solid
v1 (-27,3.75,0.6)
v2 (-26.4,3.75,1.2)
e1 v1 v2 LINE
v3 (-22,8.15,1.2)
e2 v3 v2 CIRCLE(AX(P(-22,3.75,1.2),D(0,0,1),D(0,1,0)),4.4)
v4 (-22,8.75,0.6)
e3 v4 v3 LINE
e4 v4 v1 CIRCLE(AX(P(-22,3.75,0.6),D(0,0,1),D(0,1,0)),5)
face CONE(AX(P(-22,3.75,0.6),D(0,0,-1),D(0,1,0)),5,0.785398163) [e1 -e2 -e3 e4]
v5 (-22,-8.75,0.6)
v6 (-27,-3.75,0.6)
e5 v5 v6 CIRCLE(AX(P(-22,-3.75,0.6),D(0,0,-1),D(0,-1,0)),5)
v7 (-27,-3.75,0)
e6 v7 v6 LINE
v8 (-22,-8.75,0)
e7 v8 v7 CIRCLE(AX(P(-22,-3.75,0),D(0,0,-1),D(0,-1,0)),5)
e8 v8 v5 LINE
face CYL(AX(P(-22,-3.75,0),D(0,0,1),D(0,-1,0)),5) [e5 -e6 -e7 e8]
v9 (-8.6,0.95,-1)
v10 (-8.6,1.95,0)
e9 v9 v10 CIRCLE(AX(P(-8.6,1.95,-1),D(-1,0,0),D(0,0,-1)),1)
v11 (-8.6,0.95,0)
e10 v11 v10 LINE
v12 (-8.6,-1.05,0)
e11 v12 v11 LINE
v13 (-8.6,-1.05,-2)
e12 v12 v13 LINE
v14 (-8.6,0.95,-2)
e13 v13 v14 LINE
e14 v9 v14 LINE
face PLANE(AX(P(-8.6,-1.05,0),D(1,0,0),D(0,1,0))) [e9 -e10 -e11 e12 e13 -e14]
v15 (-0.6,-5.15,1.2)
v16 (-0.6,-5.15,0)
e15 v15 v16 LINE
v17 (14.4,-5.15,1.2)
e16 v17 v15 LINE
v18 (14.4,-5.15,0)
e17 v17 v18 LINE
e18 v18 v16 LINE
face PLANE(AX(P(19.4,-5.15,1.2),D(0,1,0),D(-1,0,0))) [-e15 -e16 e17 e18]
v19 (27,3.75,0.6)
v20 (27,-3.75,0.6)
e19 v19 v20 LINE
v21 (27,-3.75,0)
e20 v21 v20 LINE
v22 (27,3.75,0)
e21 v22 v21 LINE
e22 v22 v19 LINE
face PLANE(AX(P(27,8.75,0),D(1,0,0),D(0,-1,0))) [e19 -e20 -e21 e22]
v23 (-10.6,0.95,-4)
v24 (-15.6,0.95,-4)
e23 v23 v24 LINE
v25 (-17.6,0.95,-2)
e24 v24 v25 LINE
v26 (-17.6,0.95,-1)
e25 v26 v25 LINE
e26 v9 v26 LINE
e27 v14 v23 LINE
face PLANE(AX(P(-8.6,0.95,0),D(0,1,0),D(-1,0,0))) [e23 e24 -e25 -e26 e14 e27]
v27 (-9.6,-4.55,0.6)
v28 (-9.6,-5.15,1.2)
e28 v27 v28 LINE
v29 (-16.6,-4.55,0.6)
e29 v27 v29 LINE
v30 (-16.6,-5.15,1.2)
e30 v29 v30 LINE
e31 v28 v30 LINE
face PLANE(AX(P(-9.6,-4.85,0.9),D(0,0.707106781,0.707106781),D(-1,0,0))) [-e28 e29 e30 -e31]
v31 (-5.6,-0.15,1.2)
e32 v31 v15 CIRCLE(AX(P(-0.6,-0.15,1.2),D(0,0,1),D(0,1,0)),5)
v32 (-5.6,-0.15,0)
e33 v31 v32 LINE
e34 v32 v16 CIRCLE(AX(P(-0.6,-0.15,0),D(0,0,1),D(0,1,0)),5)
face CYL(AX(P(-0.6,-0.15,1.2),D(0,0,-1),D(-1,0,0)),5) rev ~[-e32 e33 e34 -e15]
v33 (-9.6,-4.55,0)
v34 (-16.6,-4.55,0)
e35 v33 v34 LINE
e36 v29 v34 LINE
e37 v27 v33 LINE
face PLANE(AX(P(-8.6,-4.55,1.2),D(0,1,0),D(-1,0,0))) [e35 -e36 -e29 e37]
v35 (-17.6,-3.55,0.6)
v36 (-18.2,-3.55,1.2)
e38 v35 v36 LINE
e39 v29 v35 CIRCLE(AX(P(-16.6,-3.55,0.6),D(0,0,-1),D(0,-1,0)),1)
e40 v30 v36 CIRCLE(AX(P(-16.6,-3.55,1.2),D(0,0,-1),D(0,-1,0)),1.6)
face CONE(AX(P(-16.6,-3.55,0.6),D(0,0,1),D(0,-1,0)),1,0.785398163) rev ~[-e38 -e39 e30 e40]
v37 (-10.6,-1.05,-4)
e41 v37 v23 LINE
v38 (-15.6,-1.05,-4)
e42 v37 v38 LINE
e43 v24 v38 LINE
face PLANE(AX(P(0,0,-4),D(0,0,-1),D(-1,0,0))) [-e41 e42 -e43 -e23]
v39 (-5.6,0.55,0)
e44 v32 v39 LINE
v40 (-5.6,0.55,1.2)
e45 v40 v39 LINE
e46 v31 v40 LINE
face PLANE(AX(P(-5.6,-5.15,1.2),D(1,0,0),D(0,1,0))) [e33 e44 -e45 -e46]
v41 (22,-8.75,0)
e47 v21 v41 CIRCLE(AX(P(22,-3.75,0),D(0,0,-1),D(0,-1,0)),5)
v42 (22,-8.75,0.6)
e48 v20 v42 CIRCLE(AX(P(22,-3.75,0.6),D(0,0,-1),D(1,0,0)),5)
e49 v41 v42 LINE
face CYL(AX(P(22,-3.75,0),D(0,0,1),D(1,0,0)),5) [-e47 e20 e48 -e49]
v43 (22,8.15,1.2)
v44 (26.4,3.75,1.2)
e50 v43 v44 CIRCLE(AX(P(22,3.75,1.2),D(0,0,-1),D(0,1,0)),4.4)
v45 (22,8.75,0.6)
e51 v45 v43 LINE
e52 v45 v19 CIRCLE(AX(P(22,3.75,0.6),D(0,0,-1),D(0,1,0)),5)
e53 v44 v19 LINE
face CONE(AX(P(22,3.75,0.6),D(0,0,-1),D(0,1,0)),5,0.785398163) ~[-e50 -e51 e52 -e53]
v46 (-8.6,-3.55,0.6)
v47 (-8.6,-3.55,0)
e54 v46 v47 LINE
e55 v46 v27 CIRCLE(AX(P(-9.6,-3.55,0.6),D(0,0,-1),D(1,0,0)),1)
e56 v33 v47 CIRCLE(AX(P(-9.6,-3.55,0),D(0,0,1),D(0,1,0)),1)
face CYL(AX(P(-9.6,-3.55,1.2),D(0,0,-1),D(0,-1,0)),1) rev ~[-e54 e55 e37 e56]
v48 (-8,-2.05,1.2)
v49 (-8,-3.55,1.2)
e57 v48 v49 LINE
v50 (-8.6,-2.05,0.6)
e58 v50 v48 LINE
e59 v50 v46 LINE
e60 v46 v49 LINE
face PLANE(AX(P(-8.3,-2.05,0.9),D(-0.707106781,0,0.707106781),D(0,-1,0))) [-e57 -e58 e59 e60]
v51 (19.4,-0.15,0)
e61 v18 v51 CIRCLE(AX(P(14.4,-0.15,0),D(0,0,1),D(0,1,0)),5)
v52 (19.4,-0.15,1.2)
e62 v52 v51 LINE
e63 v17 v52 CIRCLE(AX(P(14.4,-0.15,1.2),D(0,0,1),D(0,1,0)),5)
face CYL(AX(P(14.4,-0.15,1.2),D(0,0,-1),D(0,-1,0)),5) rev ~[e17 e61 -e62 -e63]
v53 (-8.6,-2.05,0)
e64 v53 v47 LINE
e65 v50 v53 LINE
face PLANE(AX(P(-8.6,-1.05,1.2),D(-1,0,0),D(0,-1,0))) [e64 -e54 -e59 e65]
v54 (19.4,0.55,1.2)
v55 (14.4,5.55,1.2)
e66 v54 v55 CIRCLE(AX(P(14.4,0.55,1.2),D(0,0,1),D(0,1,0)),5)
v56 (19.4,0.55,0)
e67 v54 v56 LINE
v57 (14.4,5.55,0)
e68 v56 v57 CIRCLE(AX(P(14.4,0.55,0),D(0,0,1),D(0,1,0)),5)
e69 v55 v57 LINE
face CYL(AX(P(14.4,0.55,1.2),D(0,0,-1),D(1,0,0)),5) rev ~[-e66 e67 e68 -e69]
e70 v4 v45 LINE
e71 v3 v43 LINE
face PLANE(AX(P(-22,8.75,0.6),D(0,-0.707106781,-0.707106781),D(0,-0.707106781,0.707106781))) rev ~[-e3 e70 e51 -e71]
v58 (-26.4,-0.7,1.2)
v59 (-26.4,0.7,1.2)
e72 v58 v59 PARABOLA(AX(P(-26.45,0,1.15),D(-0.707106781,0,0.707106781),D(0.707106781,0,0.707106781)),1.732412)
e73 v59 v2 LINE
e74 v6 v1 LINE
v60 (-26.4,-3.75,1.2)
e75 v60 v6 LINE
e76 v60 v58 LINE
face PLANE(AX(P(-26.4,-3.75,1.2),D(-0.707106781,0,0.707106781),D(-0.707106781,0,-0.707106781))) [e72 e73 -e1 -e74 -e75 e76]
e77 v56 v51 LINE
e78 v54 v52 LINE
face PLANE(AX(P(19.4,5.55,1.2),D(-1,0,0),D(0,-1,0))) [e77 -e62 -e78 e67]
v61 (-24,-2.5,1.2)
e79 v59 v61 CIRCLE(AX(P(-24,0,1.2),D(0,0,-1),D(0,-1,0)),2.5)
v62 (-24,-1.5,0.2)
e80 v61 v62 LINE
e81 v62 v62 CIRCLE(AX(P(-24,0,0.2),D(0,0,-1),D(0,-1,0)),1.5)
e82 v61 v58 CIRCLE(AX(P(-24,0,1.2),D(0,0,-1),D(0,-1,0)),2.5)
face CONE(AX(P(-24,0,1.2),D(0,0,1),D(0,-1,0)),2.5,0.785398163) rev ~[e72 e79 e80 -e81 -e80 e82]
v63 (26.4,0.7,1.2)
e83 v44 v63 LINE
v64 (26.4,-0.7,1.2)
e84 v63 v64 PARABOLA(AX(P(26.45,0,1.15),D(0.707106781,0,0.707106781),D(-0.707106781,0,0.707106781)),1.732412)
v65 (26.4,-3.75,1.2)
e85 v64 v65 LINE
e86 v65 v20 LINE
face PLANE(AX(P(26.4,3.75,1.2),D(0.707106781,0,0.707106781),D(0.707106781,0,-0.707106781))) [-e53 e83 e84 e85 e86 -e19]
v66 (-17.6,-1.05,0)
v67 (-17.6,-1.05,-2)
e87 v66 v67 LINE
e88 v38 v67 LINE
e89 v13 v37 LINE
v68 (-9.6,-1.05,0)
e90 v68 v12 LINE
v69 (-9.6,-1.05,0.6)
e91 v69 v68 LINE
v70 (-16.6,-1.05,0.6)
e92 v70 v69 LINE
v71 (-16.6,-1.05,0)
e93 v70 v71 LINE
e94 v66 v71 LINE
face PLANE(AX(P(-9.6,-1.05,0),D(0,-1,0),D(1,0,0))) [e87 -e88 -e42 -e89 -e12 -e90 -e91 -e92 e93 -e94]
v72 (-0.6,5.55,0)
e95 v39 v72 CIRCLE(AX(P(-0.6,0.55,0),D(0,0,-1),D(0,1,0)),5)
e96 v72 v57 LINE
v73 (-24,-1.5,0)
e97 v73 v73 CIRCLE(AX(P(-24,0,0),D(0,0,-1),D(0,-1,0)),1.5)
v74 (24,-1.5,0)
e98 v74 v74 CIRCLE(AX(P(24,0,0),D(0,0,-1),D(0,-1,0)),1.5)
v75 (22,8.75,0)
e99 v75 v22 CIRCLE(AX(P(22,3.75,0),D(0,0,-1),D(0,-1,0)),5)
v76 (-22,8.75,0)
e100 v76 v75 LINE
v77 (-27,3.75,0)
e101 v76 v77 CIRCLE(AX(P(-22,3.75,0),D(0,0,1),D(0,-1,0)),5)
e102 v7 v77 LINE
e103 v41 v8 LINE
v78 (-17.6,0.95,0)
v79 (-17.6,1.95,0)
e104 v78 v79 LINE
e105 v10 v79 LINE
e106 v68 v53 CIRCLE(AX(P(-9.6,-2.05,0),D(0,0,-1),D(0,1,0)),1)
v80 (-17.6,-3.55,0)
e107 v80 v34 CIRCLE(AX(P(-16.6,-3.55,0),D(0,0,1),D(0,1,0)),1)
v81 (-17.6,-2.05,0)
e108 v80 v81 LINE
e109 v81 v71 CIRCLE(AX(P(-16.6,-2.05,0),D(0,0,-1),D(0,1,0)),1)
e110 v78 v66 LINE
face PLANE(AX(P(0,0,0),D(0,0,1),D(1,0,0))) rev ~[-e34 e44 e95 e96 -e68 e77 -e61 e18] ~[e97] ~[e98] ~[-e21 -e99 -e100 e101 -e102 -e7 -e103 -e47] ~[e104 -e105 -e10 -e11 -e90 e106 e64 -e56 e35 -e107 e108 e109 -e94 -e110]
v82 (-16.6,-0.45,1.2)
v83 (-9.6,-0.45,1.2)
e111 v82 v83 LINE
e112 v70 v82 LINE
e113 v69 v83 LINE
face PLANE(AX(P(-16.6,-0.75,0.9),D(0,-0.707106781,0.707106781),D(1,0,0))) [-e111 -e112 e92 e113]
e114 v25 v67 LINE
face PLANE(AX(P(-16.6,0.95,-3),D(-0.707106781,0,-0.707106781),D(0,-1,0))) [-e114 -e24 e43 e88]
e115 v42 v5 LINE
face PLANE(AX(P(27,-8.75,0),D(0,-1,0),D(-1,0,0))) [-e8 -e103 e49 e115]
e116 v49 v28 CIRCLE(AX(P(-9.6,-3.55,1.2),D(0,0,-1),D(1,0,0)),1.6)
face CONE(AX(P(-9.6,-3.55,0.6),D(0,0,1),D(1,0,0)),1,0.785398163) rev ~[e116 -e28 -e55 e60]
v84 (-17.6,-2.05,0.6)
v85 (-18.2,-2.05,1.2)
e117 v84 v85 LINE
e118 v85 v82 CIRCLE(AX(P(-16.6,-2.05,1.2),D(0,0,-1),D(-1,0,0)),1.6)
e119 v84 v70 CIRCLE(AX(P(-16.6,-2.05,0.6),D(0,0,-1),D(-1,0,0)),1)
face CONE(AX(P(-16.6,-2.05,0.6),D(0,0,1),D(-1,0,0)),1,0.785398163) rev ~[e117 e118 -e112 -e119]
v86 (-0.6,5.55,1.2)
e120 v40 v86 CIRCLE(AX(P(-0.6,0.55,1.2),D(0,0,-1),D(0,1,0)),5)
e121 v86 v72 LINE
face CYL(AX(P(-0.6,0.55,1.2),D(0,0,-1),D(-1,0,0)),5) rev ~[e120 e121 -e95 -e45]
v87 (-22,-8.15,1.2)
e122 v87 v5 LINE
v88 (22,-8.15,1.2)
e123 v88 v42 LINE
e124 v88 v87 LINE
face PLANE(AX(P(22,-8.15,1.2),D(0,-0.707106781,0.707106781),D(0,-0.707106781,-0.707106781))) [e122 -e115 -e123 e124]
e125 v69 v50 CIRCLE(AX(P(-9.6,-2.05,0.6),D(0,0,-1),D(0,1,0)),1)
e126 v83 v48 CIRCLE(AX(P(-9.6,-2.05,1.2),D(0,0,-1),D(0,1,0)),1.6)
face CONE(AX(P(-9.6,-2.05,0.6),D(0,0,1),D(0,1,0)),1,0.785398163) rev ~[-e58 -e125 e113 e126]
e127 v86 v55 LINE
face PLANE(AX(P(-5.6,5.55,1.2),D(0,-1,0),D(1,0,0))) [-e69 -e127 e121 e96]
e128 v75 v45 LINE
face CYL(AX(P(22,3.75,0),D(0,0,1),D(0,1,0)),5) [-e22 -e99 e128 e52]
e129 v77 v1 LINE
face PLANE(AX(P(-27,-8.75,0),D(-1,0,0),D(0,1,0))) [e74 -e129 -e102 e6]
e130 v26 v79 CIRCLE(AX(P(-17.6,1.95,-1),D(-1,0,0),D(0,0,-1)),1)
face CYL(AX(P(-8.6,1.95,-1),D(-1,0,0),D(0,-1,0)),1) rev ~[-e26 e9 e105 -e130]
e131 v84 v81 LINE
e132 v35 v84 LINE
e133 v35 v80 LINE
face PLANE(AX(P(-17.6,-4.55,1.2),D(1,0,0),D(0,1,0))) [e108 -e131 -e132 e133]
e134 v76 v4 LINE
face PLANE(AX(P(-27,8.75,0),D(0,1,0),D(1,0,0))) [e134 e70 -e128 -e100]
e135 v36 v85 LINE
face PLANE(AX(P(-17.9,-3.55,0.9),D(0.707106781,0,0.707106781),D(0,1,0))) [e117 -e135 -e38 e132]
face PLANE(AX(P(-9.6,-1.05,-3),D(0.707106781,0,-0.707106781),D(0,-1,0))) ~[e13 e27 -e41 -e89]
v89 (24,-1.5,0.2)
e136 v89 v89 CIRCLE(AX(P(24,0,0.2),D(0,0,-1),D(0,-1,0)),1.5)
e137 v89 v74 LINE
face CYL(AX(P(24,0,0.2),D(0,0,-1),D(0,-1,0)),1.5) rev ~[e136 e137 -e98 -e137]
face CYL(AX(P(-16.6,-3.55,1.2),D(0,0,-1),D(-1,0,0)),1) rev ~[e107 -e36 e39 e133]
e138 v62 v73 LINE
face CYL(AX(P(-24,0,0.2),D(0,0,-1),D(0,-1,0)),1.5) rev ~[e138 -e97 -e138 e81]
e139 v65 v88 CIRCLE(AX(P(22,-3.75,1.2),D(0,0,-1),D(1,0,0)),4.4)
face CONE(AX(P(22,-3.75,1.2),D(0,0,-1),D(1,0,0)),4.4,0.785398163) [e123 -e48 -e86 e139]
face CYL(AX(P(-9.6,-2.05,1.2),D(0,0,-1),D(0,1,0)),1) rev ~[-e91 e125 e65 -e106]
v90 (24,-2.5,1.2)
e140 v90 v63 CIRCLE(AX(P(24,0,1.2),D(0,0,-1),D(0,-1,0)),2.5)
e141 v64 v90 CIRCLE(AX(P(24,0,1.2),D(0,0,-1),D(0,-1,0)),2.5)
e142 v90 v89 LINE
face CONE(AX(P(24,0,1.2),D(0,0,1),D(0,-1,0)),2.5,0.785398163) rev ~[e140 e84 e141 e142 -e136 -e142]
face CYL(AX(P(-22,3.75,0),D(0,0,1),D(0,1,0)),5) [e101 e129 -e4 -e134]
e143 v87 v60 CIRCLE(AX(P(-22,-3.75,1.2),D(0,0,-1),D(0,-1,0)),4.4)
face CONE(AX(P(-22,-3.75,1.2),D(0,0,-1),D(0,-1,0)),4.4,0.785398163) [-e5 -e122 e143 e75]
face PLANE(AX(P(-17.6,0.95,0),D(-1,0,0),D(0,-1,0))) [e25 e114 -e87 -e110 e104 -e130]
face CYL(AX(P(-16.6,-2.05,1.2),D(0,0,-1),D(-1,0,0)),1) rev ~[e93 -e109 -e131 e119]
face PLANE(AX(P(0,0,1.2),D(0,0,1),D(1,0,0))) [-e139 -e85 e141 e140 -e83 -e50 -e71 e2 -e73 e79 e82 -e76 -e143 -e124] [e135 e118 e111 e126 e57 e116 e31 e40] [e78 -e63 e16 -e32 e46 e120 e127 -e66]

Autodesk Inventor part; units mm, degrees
ref_plane "YZ Plane" through (0, 0, 0) normal (1, 0, 0) x (0, 1, 0)
ref_plane "XZ Plane" through (0, 0, 0) normal (0, 1, 0) x (-1, 0, 0)
ref_plane "XY Plane" through (0, 0, 0) normal (0, 0, 1) x (1, 0, 0)
sketch "Sketch1" plane through (0, 0, 0) normal (0, 0, 1) x (1, 0, 0)
  line L0 (-27, 8.75) -> (27, 8.75)
  line L1 (27, 8.75) -> (27, -8.75)
  line L2 (27, -8.75) -> (-27, -8.75)
  line L3 (-27, -8.75) -> (-27, 8.75)
  point P0 (0, 0)
  dimension "d0" = 17.5
  dimension "d1" = 54
  dimension "d2" = 8.75
  dimension "d3" = 27
extrude "Extrusion1" add sketch "Sketch1" along normal blind 1.2
fillet "Fillet1" radius 5 4 edges at (-27, 8.75, 0.6) (-27, -8.75, 0.6) (27, 8.75, 0.6) (27, -8.75, 0.6)
sketch "Sketch2" plane through (0, 0, 1.2) normal (0, 0, 1) x (1, 0, 0)
  line L0 (-22, -8.75) -> (22, -8.75) projected
  line L1 (-27, 3.75) -> (-27, -3.75) projected
  line L2 (27, -3.75) -> (27, 3.75) projected
  point P0 (0, 0)
  point P1 (-24, 0)
  point P2 (24, 0)
  dimension "d7" = 8.75
  dimension "d8" = 8.75
  dimension "d9" = 3
  dimension "d10" = 3
hole "Hole1" at (-24, 0, 1.2) at (24, 0, 1.2) direction (0, 0, -1) diameter 3 depth 8.8 tip angle 118 countersink diameter 5 countersink angle 90
chamfer "Chamfer1" distance 0.6 angle 45 8 edges at (0, 8.75, 1.2) (-25.5355, 7.2855, 1.2) (-27, 0, 1.2) (-25.5355, -7.2855, 1.2) (0, -8.75, 1.2) (25.5355, -7.2855, 1.2) (27, 0, 1.2) (25.5355, 7.2855, 1.2)
sketch "Sketch3" plane through (0, 0, 1.2) normal (0, 0, 1) x (1, 0, 0)
  line L0 (-21, 6.75) -> (21, 6.75)
  line L1 (21, 6.75) -> (21, -6.75)
  line L2 (21, -6.75) -> (-21, -6.75)
  line L3 (-21, -6.75) -> (-21, 6.75)
  line L4 (22, 8.75) -> (-22, 8.75) projected
  line L5 (-22, -8.75) -> (22, -8.75) projected
  line L6 (-27, 3.75) -> (-27, -3.75) projected
  line L7 (27, -3.75) -> (27, 3.75) projected
  line L8 (-17.6, -1.05) -> (-8.6, -1.05)
  line L9 (-8.6, -1.05) -> (-8.6, -4.55)
  line L10 (-8.6, -4.55) -> (-17.6, -4.55)
  line L11 (-17.6, -4.55) -> (-17.6, -1.05)
  point P0 (0, 0)
  dimension "d21" = 2
  dimension "d22" = 2
  dimension "d23" = 6
  dimension "d24" = 6
  dimension "d25" = 3.4
  dimension "d26" = 9
  dimension "d27" = 3.5
  dimension "d28" = 2.2
extrude "Extrusion2" cut sketch "Sketch3" against normal blind 1.2 contours L8 L9 L10 L11
sketch "Sketch4" plane through (0, 0, 1.2) normal (0, 0, 1) x (1, 0, 0)
  line L0 (-5.6, 5.55) -> (19.4, 5.55)
  line L1 (19.4, 5.55) -> (19.4, -5.15)
  line L2 (19.4, -5.15) -> (-5.6, -5.15)
  line L3 (-5.6, -5.15) -> (-5.6, 5.55)
  line L4 (22, 8.75) -> (-22, 8.75) projected
  line L5 (-27, 3.75) -> (-27, -3.75) projected
  line L6 (-8.6, -4.55) -> (-17.6, -4.55) projected
  point P0 (0, 0)
  dimension "d31" = 25
  dimension "d32" = 10.7
  dimension "d34" = 21.4
  dimension "d35" = 3.2
  dimension "d36" = 0.6
extrude "Extrusion3" cut sketch "Sketch4" against normal blind 1.2
fillet "Fillet2" radius 5 4 edges at (-5.6, 5.55, 0.6) (-5.6, -5.15, 0.6) (19.4, 5.55, 0.6) (19.4, -5.15, 0.6)
fillet "Fillet3" radius 1 4 edges at (-8.6, -1.05, 0.6) (-17.6, -1.05, 0.6) (-17.6, -4.55, 0.6) (-8.6, -4.55, 0.6)
sketch "Sketch5" plane through (0, 0, 0) normal (0, 0, -1) x (-1, 0, 0)
  line L0 (8.6, 0.95) -> (17.6, 0.95)
  line L1 (17.6, 0.95) -> (17.6, -1.05)
  line L2 (17.6, -1.05) -> (8.6, -1.05)
  line L3 (8.6, -1.05) -> (8.6, 0.95)
  line L4 (9.6, -1.05) -> (16.6, -1.05) projected
  line L5 (8.6, -3.55) -> (8.6, -2.05) projected
  line L6 (17.6, -2.05) -> (17.6, -3.55) projected
  point P0 (0, 0)
  dimension "d47" = 2
extrude "Extrusion4" add sketch "Sketch5" along normal blind 4
fillet "Fillet4" radius 1 1 edges at (-13.1, 0.95, 0)
chamfer "Chamfer4" distance 2 angle 45 2 edges at (-8.6, -0.05, -4) (-17.6, -0.05, -4)
chamfer "Chamfer6" distance 0.6 angle 45 8 edges at (-13.1, -1.05, 1.2) (-8.8929, -1.3429, 1.2) (-8.6, -2.8, 1.2) (-8.8929, -4.2571, 1.2) (-13.1, -4.55, 1.2) (-17.3071, -4.2571, 1.2) (-17.6, -2.8, 1.2) (-17.3071, -1.3429, 1.2)
properties part number "cover"
